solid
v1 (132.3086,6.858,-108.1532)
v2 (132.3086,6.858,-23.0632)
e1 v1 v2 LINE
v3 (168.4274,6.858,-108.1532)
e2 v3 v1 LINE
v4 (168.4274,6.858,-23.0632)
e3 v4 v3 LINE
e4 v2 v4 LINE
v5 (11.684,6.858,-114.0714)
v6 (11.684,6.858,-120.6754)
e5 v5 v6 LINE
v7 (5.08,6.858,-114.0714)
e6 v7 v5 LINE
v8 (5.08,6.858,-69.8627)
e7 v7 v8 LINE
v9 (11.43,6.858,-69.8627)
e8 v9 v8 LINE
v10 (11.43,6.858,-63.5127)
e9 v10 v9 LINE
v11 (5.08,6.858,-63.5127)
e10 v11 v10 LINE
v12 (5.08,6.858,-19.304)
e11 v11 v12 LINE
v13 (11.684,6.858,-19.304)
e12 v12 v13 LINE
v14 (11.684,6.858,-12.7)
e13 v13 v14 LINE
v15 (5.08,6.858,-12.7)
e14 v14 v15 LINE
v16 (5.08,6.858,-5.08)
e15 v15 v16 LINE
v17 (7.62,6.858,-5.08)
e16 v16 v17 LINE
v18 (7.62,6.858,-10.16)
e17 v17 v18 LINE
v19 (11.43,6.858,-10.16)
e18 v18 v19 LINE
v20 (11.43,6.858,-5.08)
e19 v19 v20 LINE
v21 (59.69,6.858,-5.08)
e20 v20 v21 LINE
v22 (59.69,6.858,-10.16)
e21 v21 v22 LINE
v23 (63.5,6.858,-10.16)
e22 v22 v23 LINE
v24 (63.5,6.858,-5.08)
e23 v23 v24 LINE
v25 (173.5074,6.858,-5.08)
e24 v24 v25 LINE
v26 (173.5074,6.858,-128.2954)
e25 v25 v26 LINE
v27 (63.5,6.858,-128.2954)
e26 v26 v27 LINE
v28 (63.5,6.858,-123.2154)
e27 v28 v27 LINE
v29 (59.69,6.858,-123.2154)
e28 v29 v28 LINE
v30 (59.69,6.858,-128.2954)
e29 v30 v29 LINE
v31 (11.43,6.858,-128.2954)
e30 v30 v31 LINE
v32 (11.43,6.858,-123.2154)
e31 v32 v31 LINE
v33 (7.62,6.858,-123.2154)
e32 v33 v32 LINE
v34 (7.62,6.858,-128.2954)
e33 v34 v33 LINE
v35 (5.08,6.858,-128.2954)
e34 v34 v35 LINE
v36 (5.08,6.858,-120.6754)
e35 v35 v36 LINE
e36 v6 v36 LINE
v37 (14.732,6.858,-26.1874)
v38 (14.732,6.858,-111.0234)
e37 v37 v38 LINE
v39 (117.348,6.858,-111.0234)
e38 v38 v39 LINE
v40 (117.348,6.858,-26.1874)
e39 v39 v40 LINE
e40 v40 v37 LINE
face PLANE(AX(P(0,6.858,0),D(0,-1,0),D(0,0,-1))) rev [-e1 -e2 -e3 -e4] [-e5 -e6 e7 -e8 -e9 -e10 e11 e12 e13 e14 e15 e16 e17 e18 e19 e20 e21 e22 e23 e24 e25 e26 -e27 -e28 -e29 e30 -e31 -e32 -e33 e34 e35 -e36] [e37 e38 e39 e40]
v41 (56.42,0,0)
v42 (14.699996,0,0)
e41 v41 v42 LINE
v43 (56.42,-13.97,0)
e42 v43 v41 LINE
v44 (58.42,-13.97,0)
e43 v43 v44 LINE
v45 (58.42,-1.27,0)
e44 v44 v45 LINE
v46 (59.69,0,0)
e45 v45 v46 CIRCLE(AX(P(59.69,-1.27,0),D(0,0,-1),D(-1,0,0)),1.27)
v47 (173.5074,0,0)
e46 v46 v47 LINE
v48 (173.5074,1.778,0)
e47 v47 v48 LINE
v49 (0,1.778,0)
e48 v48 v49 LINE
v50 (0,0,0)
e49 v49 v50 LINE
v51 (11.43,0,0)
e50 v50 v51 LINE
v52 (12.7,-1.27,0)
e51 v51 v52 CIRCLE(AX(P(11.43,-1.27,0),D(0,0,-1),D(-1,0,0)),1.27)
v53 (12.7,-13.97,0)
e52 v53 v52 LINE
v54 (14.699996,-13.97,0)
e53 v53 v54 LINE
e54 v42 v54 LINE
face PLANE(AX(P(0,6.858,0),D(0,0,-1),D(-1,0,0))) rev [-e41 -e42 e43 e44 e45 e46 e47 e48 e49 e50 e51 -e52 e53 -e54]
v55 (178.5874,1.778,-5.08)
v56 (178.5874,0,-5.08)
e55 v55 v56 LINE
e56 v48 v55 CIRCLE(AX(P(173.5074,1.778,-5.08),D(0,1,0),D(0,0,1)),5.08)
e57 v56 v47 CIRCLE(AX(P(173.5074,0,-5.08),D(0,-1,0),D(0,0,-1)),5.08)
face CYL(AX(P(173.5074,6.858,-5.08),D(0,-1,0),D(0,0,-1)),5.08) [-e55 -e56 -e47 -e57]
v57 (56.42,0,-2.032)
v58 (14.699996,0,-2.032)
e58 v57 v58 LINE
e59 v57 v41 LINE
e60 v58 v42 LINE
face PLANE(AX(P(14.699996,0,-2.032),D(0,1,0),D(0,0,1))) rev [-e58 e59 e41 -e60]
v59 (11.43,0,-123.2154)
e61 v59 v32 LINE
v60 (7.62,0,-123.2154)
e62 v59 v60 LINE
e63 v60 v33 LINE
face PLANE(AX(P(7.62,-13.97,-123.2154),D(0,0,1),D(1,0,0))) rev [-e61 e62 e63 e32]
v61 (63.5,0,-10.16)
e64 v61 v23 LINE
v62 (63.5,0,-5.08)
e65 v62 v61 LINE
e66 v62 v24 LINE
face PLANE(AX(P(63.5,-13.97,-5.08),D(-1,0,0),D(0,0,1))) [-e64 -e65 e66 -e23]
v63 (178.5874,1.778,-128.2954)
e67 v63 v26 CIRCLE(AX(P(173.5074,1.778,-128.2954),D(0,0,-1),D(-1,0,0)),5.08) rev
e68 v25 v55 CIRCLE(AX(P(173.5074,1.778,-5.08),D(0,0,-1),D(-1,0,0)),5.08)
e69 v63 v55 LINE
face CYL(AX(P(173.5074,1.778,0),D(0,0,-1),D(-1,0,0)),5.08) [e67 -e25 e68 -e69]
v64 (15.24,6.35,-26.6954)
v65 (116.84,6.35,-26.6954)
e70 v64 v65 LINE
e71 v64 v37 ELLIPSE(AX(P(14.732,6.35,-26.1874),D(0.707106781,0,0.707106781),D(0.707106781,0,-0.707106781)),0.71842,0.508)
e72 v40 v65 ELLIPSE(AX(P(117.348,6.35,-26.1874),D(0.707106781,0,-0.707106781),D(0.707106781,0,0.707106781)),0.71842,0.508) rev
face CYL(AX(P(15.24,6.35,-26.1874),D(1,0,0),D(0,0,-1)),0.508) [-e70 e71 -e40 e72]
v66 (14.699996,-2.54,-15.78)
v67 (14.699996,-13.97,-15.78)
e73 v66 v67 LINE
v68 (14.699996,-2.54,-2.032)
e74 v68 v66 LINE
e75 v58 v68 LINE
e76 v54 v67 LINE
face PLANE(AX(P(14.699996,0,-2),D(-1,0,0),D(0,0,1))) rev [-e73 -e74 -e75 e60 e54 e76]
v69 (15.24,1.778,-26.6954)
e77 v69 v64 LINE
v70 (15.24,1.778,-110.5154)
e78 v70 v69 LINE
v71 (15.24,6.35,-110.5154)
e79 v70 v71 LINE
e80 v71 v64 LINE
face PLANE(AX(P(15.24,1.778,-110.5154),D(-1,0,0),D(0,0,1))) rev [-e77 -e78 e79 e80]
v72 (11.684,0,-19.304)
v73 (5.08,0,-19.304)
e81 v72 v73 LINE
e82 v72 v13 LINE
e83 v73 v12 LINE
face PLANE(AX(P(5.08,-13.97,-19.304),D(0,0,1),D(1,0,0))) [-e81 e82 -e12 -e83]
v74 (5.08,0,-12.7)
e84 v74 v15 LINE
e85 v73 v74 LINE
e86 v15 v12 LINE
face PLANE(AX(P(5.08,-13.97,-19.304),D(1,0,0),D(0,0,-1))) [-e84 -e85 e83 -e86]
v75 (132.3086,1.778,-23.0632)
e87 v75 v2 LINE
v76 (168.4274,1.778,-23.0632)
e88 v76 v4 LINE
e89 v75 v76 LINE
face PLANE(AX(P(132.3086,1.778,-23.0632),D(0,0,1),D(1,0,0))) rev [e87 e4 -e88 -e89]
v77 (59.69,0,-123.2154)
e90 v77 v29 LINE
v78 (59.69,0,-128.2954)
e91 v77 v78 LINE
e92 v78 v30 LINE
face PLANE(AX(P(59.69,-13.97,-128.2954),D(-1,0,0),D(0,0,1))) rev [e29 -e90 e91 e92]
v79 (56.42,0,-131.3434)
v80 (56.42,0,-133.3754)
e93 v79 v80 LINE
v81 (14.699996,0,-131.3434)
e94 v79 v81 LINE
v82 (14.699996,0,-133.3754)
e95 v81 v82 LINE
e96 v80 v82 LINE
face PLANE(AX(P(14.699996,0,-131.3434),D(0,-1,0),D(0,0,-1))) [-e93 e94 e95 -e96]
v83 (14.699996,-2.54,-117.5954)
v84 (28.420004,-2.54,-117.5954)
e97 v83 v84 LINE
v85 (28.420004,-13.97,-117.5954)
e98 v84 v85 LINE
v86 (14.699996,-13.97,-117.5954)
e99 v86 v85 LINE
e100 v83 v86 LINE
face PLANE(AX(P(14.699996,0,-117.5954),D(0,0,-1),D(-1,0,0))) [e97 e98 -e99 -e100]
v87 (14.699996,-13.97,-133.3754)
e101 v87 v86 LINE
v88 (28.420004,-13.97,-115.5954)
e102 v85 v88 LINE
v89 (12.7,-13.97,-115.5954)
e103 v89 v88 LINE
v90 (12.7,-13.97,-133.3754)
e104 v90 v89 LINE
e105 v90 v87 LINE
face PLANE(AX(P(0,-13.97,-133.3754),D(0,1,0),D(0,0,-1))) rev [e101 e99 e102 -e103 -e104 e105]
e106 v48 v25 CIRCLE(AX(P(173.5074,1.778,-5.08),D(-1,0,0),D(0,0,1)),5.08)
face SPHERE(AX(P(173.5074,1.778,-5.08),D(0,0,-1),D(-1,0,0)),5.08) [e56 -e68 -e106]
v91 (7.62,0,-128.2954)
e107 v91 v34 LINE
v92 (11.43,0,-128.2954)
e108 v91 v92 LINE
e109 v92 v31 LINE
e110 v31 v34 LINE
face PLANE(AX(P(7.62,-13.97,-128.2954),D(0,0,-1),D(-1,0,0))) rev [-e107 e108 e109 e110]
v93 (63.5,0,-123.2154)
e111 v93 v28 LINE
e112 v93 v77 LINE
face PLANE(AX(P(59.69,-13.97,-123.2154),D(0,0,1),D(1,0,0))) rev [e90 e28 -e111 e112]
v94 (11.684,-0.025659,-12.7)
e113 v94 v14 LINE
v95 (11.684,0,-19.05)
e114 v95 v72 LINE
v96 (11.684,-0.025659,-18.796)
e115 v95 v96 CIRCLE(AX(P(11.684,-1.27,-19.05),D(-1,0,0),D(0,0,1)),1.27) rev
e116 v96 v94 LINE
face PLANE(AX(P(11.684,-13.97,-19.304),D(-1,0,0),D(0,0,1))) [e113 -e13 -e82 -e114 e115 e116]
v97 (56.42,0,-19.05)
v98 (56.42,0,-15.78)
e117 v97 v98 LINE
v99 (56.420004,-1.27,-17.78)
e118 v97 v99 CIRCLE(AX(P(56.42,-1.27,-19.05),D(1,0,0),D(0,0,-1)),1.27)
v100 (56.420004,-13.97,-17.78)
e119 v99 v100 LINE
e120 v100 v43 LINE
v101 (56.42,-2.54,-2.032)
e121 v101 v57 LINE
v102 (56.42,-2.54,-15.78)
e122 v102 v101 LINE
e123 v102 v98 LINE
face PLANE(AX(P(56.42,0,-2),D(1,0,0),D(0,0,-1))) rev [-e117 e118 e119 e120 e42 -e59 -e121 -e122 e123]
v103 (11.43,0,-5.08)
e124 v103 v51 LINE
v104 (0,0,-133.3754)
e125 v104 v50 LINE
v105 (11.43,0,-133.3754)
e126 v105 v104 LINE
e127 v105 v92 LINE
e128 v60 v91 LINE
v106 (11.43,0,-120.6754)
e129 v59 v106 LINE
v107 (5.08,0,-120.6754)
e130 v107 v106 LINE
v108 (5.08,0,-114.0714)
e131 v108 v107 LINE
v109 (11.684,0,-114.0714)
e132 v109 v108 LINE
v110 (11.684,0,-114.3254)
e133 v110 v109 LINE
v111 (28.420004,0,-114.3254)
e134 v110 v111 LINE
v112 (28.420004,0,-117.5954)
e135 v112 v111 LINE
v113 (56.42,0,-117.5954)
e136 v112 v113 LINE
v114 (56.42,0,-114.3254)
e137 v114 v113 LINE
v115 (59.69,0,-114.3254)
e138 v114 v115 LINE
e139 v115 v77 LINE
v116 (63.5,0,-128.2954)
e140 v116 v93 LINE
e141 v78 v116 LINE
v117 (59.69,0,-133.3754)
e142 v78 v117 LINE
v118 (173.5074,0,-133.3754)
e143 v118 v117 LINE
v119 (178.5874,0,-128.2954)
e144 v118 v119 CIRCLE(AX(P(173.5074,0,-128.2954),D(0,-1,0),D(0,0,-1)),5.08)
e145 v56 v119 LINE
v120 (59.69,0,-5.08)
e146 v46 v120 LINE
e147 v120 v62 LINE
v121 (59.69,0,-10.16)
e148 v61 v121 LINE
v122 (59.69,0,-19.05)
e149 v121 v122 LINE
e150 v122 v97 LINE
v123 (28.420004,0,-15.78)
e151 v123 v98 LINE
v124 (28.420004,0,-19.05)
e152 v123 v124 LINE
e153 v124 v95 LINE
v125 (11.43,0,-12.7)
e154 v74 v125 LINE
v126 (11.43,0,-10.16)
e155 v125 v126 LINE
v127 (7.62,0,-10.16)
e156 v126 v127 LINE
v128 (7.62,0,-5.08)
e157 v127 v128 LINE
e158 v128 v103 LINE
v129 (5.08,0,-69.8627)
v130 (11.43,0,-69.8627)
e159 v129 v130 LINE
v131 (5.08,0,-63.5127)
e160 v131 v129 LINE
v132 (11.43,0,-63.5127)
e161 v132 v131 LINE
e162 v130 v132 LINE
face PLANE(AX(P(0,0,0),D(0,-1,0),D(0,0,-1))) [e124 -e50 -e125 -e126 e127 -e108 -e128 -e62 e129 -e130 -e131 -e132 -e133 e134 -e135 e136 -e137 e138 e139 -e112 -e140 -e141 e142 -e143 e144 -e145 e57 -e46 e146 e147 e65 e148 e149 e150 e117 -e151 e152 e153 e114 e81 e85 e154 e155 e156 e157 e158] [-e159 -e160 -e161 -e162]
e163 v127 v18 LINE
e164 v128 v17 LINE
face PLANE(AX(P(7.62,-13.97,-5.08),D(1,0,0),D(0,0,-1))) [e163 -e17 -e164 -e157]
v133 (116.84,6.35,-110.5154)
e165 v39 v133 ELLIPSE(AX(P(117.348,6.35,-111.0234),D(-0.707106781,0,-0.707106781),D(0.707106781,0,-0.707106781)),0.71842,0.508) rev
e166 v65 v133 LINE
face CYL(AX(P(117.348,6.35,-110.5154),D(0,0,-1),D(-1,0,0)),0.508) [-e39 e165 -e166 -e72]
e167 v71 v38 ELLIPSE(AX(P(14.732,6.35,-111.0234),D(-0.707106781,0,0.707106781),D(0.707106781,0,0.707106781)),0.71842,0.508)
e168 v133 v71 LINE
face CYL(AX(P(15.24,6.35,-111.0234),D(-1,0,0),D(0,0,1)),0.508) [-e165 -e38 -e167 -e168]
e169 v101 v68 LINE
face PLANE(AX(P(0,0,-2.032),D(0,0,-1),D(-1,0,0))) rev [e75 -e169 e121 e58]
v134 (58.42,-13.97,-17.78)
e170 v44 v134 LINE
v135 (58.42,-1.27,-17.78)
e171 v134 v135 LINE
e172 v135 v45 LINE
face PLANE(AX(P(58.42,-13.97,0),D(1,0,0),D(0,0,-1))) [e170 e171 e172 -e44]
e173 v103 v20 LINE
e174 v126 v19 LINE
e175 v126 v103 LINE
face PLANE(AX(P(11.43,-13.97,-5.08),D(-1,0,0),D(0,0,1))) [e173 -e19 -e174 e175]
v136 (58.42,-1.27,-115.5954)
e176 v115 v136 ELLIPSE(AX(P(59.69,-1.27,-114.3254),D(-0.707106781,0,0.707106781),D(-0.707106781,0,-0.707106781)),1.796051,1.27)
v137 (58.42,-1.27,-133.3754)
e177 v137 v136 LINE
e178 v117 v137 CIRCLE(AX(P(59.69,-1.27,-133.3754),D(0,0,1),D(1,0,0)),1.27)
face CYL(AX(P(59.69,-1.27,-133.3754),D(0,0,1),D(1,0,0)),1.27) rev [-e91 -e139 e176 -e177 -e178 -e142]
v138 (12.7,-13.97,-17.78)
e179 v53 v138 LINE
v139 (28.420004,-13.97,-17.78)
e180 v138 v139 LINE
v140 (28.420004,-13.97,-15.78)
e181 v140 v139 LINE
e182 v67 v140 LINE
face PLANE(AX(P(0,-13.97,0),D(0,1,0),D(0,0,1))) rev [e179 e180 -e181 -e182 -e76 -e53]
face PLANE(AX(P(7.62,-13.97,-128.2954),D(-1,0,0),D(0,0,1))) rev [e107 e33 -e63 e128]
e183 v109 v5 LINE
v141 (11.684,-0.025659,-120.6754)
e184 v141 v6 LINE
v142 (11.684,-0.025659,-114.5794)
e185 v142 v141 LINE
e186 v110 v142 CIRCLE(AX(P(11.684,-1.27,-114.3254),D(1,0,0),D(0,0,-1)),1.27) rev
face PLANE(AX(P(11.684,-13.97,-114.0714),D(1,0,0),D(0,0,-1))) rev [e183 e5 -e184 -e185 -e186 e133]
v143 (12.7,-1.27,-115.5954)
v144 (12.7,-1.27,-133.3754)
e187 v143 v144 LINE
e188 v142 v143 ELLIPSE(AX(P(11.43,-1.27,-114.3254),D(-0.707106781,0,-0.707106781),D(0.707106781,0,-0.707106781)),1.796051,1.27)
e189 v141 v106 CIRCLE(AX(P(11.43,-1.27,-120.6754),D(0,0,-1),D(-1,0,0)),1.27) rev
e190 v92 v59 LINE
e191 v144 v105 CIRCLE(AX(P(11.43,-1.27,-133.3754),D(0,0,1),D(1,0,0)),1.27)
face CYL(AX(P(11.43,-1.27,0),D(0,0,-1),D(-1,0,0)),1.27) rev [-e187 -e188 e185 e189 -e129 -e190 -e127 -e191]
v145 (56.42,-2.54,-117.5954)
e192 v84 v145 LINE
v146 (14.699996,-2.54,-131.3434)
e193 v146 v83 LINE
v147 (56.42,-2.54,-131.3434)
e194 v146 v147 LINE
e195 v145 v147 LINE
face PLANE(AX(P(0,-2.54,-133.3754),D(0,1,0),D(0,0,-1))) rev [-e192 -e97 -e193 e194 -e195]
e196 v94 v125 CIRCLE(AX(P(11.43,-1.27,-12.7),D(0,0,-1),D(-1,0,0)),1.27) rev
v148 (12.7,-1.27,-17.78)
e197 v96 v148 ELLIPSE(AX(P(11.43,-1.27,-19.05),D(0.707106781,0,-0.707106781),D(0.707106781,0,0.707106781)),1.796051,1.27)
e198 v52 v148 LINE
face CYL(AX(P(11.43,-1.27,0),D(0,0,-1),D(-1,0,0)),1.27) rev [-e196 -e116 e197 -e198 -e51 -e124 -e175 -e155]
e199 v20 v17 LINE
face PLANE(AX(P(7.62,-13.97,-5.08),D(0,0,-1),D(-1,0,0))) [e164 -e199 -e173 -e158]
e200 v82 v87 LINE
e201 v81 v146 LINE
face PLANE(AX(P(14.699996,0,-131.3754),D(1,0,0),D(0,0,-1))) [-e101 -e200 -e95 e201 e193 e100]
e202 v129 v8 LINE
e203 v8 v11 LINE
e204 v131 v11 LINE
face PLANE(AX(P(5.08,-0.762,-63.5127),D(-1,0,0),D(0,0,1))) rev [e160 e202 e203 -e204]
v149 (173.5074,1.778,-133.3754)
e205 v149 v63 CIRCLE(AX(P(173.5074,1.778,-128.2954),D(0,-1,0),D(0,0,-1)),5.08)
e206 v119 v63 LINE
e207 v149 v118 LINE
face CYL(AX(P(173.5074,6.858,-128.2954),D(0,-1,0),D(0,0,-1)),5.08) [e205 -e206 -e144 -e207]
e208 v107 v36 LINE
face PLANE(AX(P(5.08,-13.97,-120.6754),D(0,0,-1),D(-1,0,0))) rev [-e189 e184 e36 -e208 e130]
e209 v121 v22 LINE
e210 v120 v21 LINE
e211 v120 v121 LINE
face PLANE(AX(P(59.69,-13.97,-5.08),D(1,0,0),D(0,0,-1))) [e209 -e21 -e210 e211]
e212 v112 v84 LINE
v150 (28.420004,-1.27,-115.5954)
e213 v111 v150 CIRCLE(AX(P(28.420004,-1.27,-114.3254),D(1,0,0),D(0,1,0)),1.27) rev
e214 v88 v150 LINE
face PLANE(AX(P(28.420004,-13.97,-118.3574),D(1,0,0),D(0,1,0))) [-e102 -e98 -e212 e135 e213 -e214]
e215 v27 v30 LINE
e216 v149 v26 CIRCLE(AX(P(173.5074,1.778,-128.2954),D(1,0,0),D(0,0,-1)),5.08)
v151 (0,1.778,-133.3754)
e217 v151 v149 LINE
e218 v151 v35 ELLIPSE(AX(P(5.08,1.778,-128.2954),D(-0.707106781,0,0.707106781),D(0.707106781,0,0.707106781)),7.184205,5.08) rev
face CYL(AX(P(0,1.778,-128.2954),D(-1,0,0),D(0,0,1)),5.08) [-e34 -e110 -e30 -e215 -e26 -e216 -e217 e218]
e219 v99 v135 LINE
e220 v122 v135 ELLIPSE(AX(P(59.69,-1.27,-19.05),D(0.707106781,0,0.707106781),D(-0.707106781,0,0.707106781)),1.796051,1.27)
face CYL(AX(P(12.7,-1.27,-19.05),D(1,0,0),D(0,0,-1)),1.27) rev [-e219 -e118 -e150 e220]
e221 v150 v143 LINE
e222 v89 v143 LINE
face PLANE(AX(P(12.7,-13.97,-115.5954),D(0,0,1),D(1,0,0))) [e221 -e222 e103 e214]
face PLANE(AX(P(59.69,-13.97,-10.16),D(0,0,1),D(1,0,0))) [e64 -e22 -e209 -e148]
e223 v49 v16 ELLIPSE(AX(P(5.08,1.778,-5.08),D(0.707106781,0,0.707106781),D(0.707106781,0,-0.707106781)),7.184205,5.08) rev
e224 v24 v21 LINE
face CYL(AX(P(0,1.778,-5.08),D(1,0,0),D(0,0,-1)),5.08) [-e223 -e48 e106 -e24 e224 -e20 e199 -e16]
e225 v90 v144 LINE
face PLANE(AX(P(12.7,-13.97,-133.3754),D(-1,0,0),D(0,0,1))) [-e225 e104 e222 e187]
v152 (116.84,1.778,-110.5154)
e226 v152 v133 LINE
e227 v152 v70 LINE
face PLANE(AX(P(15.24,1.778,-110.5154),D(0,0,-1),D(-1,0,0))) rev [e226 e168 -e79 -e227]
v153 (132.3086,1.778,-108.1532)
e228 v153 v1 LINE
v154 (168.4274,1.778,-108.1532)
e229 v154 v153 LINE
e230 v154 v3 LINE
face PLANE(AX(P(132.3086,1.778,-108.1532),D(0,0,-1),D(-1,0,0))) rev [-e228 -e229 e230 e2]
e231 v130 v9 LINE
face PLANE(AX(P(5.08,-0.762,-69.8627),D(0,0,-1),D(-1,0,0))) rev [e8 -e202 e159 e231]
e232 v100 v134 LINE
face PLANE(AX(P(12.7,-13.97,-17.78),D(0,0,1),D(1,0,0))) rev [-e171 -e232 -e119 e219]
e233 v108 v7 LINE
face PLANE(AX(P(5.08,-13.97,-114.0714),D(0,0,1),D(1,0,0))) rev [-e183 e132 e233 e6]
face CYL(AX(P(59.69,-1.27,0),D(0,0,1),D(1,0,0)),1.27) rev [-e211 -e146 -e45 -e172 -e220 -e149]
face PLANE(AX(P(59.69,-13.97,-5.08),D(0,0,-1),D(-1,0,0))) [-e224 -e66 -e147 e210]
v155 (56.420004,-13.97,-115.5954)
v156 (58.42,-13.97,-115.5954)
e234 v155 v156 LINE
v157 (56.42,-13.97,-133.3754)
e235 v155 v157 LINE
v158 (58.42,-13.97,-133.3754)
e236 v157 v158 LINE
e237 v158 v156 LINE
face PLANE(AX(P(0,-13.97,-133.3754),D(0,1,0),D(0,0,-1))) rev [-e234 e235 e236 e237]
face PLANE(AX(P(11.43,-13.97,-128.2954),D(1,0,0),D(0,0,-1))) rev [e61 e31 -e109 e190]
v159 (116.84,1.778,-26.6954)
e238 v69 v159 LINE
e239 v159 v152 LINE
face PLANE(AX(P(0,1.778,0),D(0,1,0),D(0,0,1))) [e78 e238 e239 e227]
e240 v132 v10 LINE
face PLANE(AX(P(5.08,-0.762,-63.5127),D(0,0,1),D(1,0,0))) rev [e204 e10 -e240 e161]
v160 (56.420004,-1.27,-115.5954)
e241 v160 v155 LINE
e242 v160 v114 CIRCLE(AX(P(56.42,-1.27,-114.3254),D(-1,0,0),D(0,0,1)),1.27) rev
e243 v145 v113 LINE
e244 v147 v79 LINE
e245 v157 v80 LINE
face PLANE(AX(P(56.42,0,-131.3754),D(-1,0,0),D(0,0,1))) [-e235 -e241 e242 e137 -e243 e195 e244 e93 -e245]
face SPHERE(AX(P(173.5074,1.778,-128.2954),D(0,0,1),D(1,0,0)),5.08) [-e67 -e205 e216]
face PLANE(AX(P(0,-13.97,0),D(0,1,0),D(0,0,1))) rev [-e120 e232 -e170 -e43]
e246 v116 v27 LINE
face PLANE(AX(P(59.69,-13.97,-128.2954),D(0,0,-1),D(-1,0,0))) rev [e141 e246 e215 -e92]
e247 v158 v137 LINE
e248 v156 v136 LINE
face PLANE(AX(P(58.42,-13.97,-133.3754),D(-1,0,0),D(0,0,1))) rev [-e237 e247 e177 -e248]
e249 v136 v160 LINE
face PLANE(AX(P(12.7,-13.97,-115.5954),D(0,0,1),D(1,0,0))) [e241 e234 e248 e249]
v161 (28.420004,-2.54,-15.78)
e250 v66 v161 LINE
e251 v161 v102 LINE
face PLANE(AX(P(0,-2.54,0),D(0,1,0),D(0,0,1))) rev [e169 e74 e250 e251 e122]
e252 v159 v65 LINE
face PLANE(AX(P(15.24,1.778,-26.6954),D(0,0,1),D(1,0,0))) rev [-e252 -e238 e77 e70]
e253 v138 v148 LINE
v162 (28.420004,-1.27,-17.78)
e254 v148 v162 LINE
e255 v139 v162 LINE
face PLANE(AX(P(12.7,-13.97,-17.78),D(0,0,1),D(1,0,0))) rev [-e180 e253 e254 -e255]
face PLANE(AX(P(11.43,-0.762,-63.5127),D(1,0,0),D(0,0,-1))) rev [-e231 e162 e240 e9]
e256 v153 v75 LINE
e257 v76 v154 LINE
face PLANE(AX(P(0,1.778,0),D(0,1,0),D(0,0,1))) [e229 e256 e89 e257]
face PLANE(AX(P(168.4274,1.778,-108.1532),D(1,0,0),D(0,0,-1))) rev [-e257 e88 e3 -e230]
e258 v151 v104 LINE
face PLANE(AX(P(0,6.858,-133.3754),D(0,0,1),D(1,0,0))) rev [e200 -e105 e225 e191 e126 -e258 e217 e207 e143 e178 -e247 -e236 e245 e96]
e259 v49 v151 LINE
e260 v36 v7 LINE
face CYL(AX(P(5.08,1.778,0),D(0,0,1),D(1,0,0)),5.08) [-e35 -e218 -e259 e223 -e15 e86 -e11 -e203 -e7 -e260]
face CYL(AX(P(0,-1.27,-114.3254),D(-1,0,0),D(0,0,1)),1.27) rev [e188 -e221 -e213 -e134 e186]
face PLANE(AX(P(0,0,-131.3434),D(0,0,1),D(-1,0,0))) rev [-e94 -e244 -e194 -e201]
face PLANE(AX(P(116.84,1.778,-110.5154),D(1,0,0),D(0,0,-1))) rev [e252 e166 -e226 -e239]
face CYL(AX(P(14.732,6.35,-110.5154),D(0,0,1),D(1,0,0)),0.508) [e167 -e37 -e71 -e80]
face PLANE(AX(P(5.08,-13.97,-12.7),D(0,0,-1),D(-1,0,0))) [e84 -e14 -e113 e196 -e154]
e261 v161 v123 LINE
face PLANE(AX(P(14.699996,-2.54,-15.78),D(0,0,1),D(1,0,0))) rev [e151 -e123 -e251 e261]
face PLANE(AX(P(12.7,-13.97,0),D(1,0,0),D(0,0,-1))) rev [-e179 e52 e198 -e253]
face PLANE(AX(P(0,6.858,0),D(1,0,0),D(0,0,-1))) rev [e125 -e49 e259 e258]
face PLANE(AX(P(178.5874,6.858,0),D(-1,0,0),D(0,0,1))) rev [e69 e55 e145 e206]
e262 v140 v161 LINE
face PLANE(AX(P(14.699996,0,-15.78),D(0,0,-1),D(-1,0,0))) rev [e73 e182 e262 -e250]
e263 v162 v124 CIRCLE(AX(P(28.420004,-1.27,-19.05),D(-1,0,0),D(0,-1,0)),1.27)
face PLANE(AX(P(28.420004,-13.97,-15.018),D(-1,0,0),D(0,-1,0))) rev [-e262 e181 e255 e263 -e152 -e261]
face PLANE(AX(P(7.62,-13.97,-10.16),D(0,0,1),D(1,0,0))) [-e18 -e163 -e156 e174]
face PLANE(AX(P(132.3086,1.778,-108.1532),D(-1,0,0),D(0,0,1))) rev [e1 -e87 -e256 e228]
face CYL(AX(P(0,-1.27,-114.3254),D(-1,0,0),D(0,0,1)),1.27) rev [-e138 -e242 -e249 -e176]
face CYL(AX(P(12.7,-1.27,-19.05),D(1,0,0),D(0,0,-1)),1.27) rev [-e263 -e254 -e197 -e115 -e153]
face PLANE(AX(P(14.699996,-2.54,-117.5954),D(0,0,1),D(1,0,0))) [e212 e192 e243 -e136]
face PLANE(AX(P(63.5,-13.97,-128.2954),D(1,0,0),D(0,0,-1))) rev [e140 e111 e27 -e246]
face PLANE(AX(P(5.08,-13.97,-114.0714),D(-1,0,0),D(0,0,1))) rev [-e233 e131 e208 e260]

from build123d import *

# Parameters (mm, degrees)
SKETCH1_W             = 178.5874
SKETCH1_H             = 133.3754
BOSS_EXTRUDE1_DEPTH   = 6.858
FILLET1_R             = 5.08
FILLET2_R             = 5.08
SKETCH3_W             = 101.6
SKETCH3_H             = 83.82
CUT_EXTRUDE2_DEPTH    = 5.08
FILLET4_R             = 0.508
SKETCH5_W             = 45.72
SKETCH5_H             = 17.78
BOSS_EXTRUDE2_DEPTH   = 13.97
SKETCH7_W             = 41.720004
SKETCH7_H             = 13.78
CUT_EXTRUDE3_DEPTH    = 13.97
SKETCH9_W             = 21
SKETCH9_H             = 2.286
CUT_EXTRUDE4_DEPTH    = 2.762
SKETCH10_W            = 28
SKETCH10_H            = 13.97
CUT_EXTRUDE5_DEPTH    = 2.762
SKETCH11_W            = 41.720004
SKETCH11_H            = 13.78
BOSS_EXTRUDE3_DEPTH   = 2.54
MIRROR1_START         = -133.3754
MIRROR1_DEPTH         = 15.78
MIRROR1_2_DEPTH       = 2
MIRROR1_START_2       = -117.5954
MIRROR1_3_OUTLINE_W   = 15.720004
MIRROR1_3_OUTLINE_H   = 13.97
MIRROR1_3_OUTLINE_W_2 = 2
MIRROR1_3_DEPTH       = 2
SKETCH15_W            = 21
SKETCH15_H            = 11.684
CUT_EXTRUDE8_DEPTH    = 2.032
SKETCH17_W            = 20.720004
SKETCH17_H            = 13.97
CUT_EXTRUDE9_DEPTH    = 2.032
SKETCH22_W            = 6.35
SKETCH22_H            = 6.35
CUT_EXTRUDE12_DEPTH   = 7.62
FILLET6_R             = 1.27
FILLET7_R             = 1.27
SKETCH30_W            = 36.1188
SKETCH30_H            = 85.09
CUT_EXTRUDE14_DEPTH   = 5.08
SKETCH31_W            = 3.81
SKETCH31_H            = 5.08
CUT_EXTRUDE15_DEPTH   = 224.866617315
SKETCH32_W            = 3.81
SKETCH32_H            = 5.08
CUT_EXTRUDE16_DEPTH   = 224.866617315
SKETCH33_W            = 6.604
SKETCH33_H            = 6.604
CUT_EXTRUDE17_DEPTH   = 224.866617315


with BuildPart() as part:
    # Sketch1 → Boss-Extrude1 (new body)
    with BuildSketch(Plane(origin=(0, 0, 0), x_dir=(1, 0, 0), z_dir=(0, 1, 0))):
        with Locations((89.2937, 66.6877)):
            Rectangle(SKETCH1_W, SKETCH1_H)
    extrude(amount=BOSS_EXTRUDE1_DEPTH)

    # Fillet1
    fillet1_edges = [part.edges().sort_by_distance(p)[0] for p in [
        (178.5874, 6.858, -66.6877),
    ]]
    fillet(fillet1_edges, radius=FILLET1_R)

    # Fillet2
    fillet2_edges = [part.edges().sort_by_distance(p)[0] for p in [
        (86.7537, 6.858, -133.3754),
        (178.5874, 0.889, -133.3754),
        (177.099502448, 5.370102448, -133.3754),
        (178.5874, 0.889, 0),
        (177.099502448, 5.370102448, 0),
        (0, 6.858, -66.6877),
        (86.7537, 6.858, 0),
    ]]
    fillet(fillet2_edges, radius=FILLET2_R)

    # Sketch3 → Cut-Extrude2 (cut)
    with BuildSketch(Plane(origin=(0, 6.858, 0), x_dir=(1, 0, 0), z_dir=(0, 1, 0))):
        with Locations((66.04, 68.6054)):
            Rectangle(SKETCH3_W, SKETCH3_H)
    extrude(amount=-CUT_EXTRUDE2_DEPTH, mode=Mode.SUBTRACT)

    # Fillet4
    fillet4_edges = [part.edges().sort_by_distance(p)[0] for p in [
        (15.24, 6.858, -68.6054),
        (66.04, 6.858, -26.6954),
        (116.84, 6.858, -68.6054),
        (66.04, 6.858, -110.5154),
    ]]
    fillet(fillet4_edges, radius=FILLET4_R)

    # Sketch5 → Boss-Extrude2 (add)
    with BuildSketch(Plane.XZ):
        with Locations((35.56, -8.89)):
            Rectangle(SKETCH5_W, SKETCH5_H)
    extrude(amount=BOSS_EXTRUDE2_DEPTH)

    # Sketch7 → Cut-Extrude3 (cut)
    with BuildSketch(Plane.XZ.offset(13.97)):
        with Locations((35.559998, -8.89)):
            Rectangle(SKETCH7_W, SKETCH7_H)
    extrude(amount=-CUT_EXTRUDE3_DEPTH, mode=Mode.SUBTRACT)

    # Sketch9 → Cut-Extrude4 (cut)
    with BuildSketch(Plane.XY):
        with Locations((25.199996, -12.827)):
            Rectangle(SKETCH9_W, SKETCH9_H)
    extrude(amount=-CUT_EXTRUDE4_DEPTH, mode=Mode.SUBTRACT)

    # Sketch10 → Cut-Extrude5 (cut)
    with BuildSketch(Plane(origin=(0, 0, -17.78), x_dir=(-1, 0, 0), z_dir=(0, 0, -1))):
        with Locations((-42.420004, -6.985)):
            Rectangle(SKETCH10_W, SKETCH10_H)
    extrude(amount=-CUT_EXTRUDE5_DEPTH, mode=Mode.SUBTRACT)


with BuildPart() as boss_extrude3_tool:
    # Sketch11 → Boss-Extrude3 (new body)
    with BuildSketch(Plane.XZ):
        with Locations((35.559998, -8.89)):
            Rectangle(SKETCH11_W, SKETCH11_H)
    extrude(amount=BOSS_EXTRUDE3_DEPTH)


with BuildPart() as part_1:
    add(part.part)


with BuildPart() as part_2:
    # Boss-Extrude3: joined with boss_extrude3_tool
    add(part_1.part.fuse(boss_extrude3_tool.part, tol=0.00001))

    # Mirror1: read off the stored shape, not the designer's step
    # Mirror1 outline → Mirror1 (add)
    with BuildSketch(Plane.XY.offset(MIRROR1_START)):
        Polygon((12.7, -13.97), (14.699996, -13.97), (14.699996, -2.54), (56.42, -2.54), (56.42, -13.97), (58.42, -13.97), (58.42, 0), (12.7, 0), align=None)
    extrude(amount=MIRROR1_DEPTH)

    # Mirror1 2 outline → Mirror1 2 (add)
    with BuildSketch(Plane.XY.offset(MIRROR1_START)):
        Polygon((14.699996, -2.54), (14.699996, -11.684), (35.699996, -11.684), (35.699996, -13.97), (56.42, -13.97), (56.42, -2.54), align=None)
    extrude(amount=MIRROR1_2_DEPTH)

    # Mirror1 3 outline → Mirror1 3 (add)
    with BuildSketch(Plane.XY.offset(MIRROR1_START_2)):
        with Locations((20.560002, -6.985)):
            Rectangle(MIRROR1_3_OUTLINE_W, MIRROR1_3_OUTLINE_H)
        with Locations((57.42, -6.985)):
            Rectangle(MIRROR1_3_OUTLINE_W_2, MIRROR1_3_OUTLINE_H)
    extrude(amount=MIRROR1_3_DEPTH)

    # Sketch15 → Cut-Extrude8 (cut)
    with BuildSketch(Plane.XY):
        with Locations((25.199996, -5.842)):
            Rectangle(SKETCH15_W, SKETCH15_H)
    cut_extrude8 = extrude(amount=-CUT_EXTRUDE8_DEPTH, mode=Mode.SUBTRACT)

    # Sketch17 → Cut-Extrude9 (cut)
    with BuildSketch(Plane.XY):
        with Locations((46.059998, -6.985)):
            Rectangle(SKETCH17_W, SKETCH17_H)
    cut_extrude9 = extrude(amount=-CUT_EXTRUDE9_DEPTH, mode=Mode.SUBTRACT)

    # Mirror2: Cut-Extrude8, Cut-Extrude9 across plane
    add(cut_extrude8.mirror(Plane(origin=(0, 0, -66.6877), x_dir=(1, 0, 0), z_dir=(0, 0, -1))), mode=Mode.SUBTRACT)
    add(cut_extrude9.mirror(Plane(origin=(0, 0, -66.6877), x_dir=(1, 0, 0), z_dir=(0, 0, -1))), mode=Mode.SUBTRACT)

    # Sketch22 → Cut-Extrude12 (cut)
    with BuildSketch(Plane(origin=(0, 6.858, 0), x_dir=(1, 0, 0), z_dir=(0, 1, 0))):
        with Locations((8.255, 66.6877)):
            Rectangle(SKETCH22_W, SKETCH22_H)
    extrude(amount=-CUT_EXTRUDE12_DEPTH, mode=Mode.SUBTRACT)

    # Fillet6
    fillet6_edges = [part_2.edges().sort_by_distance(p)[0] for p in [
        (58.42, 0, -124.4854),
        (20.560002, 0, -115.5954),
        (12.7, 0, -124.4854),
        (57.42, 0, -115.5954),
    ]]
    fillet(fillet6_edges, radius=FILLET6_R)

    # Fillet7
    fillet7_edges = [part_2.edges().sort_by_distance(p)[0] for p in [
        (57.420002, 0, -17.78),
        (20.560002, 0, -17.78),
        (12.7, 0, -8.89),
        (58.42, 0, -8.89),
    ]]
    fillet(fillet7_edges, radius=FILLET7_R)

    # Sketch30 → Cut-Extrude14 (cut)
    with BuildSketch(Plane(origin=(0, 6.858, 0), x_dir=(1, 0, 0), z_dir=(0, 1, 0))):
        with Locations((150.368, 65.6082)):
            Rectangle(SKETCH30_W, SKETCH30_H)
    extrude(amount=-CUT_EXTRUDE14_DEPTH, mode=Mode.SUBTRACT)

    # Sketch31 → Cut-Extrude15 (cut, through all)
    with BuildSketch(Plane(origin=(0, 6.858, 0), x_dir=(1, 0, 0), z_dir=(0, 1, 0))):
        with Locations((9.525, 125.7554)):
            Rectangle(SKETCH31_W, SKETCH31_H)
    cut_extrude15 = extrude(amount=-CUT_EXTRUDE15_DEPTH, mode=Mode.SUBTRACT)

    # Sketch32 → Cut-Extrude16 (cut, through all)
    with BuildSketch(Plane(origin=(0, 6.858, 0), x_dir=(1, 0, 0), z_dir=(0, 1, 0))):
        with Locations((61.595, 125.7554)):
            Rectangle(SKETCH32_W, SKETCH32_H)
    cut_extrude16 = extrude(amount=-CUT_EXTRUDE16_DEPTH, mode=Mode.SUBTRACT)

    # Mirror3: Cut-Extrude15, Cut-Extrude16 across plane
    add(cut_extrude15.mirror(Plane(origin=(0, 0, -66.6877), x_dir=(1, 0, 0), z_dir=(0, 0, -1))), mode=Mode.SUBTRACT)
    add(cut_extrude16.mirror(Plane(origin=(0, 0, -66.6877), x_dir=(1, 0, 0), z_dir=(0, 0, -1))), mode=Mode.SUBTRACT)

    # Sketch33 → Cut-Extrude17 (cut, through all)
    with BuildSketch(Plane(origin=(0, 6.858, 0), x_dir=(1, 0, 0), z_dir=(0, 1, 0))):
        with Locations((8.382, 117.3734)):
            Rectangle(SKETCH33_W, SKETCH33_H)
    cut_extrude17 = extrude(amount=-CUT_EXTRUDE17_DEPTH, mode=Mode.SUBTRACT)

    # Mirror4: Cut-Extrude17 across plane
    add(cut_extrude17.mirror(Plane(origin=(0, 0, -66.6877), x_dir=(1, 0, 0), z_dir=(0, 0, -1))), mode=Mode.SUBTRACT)


solid = part_2.part
